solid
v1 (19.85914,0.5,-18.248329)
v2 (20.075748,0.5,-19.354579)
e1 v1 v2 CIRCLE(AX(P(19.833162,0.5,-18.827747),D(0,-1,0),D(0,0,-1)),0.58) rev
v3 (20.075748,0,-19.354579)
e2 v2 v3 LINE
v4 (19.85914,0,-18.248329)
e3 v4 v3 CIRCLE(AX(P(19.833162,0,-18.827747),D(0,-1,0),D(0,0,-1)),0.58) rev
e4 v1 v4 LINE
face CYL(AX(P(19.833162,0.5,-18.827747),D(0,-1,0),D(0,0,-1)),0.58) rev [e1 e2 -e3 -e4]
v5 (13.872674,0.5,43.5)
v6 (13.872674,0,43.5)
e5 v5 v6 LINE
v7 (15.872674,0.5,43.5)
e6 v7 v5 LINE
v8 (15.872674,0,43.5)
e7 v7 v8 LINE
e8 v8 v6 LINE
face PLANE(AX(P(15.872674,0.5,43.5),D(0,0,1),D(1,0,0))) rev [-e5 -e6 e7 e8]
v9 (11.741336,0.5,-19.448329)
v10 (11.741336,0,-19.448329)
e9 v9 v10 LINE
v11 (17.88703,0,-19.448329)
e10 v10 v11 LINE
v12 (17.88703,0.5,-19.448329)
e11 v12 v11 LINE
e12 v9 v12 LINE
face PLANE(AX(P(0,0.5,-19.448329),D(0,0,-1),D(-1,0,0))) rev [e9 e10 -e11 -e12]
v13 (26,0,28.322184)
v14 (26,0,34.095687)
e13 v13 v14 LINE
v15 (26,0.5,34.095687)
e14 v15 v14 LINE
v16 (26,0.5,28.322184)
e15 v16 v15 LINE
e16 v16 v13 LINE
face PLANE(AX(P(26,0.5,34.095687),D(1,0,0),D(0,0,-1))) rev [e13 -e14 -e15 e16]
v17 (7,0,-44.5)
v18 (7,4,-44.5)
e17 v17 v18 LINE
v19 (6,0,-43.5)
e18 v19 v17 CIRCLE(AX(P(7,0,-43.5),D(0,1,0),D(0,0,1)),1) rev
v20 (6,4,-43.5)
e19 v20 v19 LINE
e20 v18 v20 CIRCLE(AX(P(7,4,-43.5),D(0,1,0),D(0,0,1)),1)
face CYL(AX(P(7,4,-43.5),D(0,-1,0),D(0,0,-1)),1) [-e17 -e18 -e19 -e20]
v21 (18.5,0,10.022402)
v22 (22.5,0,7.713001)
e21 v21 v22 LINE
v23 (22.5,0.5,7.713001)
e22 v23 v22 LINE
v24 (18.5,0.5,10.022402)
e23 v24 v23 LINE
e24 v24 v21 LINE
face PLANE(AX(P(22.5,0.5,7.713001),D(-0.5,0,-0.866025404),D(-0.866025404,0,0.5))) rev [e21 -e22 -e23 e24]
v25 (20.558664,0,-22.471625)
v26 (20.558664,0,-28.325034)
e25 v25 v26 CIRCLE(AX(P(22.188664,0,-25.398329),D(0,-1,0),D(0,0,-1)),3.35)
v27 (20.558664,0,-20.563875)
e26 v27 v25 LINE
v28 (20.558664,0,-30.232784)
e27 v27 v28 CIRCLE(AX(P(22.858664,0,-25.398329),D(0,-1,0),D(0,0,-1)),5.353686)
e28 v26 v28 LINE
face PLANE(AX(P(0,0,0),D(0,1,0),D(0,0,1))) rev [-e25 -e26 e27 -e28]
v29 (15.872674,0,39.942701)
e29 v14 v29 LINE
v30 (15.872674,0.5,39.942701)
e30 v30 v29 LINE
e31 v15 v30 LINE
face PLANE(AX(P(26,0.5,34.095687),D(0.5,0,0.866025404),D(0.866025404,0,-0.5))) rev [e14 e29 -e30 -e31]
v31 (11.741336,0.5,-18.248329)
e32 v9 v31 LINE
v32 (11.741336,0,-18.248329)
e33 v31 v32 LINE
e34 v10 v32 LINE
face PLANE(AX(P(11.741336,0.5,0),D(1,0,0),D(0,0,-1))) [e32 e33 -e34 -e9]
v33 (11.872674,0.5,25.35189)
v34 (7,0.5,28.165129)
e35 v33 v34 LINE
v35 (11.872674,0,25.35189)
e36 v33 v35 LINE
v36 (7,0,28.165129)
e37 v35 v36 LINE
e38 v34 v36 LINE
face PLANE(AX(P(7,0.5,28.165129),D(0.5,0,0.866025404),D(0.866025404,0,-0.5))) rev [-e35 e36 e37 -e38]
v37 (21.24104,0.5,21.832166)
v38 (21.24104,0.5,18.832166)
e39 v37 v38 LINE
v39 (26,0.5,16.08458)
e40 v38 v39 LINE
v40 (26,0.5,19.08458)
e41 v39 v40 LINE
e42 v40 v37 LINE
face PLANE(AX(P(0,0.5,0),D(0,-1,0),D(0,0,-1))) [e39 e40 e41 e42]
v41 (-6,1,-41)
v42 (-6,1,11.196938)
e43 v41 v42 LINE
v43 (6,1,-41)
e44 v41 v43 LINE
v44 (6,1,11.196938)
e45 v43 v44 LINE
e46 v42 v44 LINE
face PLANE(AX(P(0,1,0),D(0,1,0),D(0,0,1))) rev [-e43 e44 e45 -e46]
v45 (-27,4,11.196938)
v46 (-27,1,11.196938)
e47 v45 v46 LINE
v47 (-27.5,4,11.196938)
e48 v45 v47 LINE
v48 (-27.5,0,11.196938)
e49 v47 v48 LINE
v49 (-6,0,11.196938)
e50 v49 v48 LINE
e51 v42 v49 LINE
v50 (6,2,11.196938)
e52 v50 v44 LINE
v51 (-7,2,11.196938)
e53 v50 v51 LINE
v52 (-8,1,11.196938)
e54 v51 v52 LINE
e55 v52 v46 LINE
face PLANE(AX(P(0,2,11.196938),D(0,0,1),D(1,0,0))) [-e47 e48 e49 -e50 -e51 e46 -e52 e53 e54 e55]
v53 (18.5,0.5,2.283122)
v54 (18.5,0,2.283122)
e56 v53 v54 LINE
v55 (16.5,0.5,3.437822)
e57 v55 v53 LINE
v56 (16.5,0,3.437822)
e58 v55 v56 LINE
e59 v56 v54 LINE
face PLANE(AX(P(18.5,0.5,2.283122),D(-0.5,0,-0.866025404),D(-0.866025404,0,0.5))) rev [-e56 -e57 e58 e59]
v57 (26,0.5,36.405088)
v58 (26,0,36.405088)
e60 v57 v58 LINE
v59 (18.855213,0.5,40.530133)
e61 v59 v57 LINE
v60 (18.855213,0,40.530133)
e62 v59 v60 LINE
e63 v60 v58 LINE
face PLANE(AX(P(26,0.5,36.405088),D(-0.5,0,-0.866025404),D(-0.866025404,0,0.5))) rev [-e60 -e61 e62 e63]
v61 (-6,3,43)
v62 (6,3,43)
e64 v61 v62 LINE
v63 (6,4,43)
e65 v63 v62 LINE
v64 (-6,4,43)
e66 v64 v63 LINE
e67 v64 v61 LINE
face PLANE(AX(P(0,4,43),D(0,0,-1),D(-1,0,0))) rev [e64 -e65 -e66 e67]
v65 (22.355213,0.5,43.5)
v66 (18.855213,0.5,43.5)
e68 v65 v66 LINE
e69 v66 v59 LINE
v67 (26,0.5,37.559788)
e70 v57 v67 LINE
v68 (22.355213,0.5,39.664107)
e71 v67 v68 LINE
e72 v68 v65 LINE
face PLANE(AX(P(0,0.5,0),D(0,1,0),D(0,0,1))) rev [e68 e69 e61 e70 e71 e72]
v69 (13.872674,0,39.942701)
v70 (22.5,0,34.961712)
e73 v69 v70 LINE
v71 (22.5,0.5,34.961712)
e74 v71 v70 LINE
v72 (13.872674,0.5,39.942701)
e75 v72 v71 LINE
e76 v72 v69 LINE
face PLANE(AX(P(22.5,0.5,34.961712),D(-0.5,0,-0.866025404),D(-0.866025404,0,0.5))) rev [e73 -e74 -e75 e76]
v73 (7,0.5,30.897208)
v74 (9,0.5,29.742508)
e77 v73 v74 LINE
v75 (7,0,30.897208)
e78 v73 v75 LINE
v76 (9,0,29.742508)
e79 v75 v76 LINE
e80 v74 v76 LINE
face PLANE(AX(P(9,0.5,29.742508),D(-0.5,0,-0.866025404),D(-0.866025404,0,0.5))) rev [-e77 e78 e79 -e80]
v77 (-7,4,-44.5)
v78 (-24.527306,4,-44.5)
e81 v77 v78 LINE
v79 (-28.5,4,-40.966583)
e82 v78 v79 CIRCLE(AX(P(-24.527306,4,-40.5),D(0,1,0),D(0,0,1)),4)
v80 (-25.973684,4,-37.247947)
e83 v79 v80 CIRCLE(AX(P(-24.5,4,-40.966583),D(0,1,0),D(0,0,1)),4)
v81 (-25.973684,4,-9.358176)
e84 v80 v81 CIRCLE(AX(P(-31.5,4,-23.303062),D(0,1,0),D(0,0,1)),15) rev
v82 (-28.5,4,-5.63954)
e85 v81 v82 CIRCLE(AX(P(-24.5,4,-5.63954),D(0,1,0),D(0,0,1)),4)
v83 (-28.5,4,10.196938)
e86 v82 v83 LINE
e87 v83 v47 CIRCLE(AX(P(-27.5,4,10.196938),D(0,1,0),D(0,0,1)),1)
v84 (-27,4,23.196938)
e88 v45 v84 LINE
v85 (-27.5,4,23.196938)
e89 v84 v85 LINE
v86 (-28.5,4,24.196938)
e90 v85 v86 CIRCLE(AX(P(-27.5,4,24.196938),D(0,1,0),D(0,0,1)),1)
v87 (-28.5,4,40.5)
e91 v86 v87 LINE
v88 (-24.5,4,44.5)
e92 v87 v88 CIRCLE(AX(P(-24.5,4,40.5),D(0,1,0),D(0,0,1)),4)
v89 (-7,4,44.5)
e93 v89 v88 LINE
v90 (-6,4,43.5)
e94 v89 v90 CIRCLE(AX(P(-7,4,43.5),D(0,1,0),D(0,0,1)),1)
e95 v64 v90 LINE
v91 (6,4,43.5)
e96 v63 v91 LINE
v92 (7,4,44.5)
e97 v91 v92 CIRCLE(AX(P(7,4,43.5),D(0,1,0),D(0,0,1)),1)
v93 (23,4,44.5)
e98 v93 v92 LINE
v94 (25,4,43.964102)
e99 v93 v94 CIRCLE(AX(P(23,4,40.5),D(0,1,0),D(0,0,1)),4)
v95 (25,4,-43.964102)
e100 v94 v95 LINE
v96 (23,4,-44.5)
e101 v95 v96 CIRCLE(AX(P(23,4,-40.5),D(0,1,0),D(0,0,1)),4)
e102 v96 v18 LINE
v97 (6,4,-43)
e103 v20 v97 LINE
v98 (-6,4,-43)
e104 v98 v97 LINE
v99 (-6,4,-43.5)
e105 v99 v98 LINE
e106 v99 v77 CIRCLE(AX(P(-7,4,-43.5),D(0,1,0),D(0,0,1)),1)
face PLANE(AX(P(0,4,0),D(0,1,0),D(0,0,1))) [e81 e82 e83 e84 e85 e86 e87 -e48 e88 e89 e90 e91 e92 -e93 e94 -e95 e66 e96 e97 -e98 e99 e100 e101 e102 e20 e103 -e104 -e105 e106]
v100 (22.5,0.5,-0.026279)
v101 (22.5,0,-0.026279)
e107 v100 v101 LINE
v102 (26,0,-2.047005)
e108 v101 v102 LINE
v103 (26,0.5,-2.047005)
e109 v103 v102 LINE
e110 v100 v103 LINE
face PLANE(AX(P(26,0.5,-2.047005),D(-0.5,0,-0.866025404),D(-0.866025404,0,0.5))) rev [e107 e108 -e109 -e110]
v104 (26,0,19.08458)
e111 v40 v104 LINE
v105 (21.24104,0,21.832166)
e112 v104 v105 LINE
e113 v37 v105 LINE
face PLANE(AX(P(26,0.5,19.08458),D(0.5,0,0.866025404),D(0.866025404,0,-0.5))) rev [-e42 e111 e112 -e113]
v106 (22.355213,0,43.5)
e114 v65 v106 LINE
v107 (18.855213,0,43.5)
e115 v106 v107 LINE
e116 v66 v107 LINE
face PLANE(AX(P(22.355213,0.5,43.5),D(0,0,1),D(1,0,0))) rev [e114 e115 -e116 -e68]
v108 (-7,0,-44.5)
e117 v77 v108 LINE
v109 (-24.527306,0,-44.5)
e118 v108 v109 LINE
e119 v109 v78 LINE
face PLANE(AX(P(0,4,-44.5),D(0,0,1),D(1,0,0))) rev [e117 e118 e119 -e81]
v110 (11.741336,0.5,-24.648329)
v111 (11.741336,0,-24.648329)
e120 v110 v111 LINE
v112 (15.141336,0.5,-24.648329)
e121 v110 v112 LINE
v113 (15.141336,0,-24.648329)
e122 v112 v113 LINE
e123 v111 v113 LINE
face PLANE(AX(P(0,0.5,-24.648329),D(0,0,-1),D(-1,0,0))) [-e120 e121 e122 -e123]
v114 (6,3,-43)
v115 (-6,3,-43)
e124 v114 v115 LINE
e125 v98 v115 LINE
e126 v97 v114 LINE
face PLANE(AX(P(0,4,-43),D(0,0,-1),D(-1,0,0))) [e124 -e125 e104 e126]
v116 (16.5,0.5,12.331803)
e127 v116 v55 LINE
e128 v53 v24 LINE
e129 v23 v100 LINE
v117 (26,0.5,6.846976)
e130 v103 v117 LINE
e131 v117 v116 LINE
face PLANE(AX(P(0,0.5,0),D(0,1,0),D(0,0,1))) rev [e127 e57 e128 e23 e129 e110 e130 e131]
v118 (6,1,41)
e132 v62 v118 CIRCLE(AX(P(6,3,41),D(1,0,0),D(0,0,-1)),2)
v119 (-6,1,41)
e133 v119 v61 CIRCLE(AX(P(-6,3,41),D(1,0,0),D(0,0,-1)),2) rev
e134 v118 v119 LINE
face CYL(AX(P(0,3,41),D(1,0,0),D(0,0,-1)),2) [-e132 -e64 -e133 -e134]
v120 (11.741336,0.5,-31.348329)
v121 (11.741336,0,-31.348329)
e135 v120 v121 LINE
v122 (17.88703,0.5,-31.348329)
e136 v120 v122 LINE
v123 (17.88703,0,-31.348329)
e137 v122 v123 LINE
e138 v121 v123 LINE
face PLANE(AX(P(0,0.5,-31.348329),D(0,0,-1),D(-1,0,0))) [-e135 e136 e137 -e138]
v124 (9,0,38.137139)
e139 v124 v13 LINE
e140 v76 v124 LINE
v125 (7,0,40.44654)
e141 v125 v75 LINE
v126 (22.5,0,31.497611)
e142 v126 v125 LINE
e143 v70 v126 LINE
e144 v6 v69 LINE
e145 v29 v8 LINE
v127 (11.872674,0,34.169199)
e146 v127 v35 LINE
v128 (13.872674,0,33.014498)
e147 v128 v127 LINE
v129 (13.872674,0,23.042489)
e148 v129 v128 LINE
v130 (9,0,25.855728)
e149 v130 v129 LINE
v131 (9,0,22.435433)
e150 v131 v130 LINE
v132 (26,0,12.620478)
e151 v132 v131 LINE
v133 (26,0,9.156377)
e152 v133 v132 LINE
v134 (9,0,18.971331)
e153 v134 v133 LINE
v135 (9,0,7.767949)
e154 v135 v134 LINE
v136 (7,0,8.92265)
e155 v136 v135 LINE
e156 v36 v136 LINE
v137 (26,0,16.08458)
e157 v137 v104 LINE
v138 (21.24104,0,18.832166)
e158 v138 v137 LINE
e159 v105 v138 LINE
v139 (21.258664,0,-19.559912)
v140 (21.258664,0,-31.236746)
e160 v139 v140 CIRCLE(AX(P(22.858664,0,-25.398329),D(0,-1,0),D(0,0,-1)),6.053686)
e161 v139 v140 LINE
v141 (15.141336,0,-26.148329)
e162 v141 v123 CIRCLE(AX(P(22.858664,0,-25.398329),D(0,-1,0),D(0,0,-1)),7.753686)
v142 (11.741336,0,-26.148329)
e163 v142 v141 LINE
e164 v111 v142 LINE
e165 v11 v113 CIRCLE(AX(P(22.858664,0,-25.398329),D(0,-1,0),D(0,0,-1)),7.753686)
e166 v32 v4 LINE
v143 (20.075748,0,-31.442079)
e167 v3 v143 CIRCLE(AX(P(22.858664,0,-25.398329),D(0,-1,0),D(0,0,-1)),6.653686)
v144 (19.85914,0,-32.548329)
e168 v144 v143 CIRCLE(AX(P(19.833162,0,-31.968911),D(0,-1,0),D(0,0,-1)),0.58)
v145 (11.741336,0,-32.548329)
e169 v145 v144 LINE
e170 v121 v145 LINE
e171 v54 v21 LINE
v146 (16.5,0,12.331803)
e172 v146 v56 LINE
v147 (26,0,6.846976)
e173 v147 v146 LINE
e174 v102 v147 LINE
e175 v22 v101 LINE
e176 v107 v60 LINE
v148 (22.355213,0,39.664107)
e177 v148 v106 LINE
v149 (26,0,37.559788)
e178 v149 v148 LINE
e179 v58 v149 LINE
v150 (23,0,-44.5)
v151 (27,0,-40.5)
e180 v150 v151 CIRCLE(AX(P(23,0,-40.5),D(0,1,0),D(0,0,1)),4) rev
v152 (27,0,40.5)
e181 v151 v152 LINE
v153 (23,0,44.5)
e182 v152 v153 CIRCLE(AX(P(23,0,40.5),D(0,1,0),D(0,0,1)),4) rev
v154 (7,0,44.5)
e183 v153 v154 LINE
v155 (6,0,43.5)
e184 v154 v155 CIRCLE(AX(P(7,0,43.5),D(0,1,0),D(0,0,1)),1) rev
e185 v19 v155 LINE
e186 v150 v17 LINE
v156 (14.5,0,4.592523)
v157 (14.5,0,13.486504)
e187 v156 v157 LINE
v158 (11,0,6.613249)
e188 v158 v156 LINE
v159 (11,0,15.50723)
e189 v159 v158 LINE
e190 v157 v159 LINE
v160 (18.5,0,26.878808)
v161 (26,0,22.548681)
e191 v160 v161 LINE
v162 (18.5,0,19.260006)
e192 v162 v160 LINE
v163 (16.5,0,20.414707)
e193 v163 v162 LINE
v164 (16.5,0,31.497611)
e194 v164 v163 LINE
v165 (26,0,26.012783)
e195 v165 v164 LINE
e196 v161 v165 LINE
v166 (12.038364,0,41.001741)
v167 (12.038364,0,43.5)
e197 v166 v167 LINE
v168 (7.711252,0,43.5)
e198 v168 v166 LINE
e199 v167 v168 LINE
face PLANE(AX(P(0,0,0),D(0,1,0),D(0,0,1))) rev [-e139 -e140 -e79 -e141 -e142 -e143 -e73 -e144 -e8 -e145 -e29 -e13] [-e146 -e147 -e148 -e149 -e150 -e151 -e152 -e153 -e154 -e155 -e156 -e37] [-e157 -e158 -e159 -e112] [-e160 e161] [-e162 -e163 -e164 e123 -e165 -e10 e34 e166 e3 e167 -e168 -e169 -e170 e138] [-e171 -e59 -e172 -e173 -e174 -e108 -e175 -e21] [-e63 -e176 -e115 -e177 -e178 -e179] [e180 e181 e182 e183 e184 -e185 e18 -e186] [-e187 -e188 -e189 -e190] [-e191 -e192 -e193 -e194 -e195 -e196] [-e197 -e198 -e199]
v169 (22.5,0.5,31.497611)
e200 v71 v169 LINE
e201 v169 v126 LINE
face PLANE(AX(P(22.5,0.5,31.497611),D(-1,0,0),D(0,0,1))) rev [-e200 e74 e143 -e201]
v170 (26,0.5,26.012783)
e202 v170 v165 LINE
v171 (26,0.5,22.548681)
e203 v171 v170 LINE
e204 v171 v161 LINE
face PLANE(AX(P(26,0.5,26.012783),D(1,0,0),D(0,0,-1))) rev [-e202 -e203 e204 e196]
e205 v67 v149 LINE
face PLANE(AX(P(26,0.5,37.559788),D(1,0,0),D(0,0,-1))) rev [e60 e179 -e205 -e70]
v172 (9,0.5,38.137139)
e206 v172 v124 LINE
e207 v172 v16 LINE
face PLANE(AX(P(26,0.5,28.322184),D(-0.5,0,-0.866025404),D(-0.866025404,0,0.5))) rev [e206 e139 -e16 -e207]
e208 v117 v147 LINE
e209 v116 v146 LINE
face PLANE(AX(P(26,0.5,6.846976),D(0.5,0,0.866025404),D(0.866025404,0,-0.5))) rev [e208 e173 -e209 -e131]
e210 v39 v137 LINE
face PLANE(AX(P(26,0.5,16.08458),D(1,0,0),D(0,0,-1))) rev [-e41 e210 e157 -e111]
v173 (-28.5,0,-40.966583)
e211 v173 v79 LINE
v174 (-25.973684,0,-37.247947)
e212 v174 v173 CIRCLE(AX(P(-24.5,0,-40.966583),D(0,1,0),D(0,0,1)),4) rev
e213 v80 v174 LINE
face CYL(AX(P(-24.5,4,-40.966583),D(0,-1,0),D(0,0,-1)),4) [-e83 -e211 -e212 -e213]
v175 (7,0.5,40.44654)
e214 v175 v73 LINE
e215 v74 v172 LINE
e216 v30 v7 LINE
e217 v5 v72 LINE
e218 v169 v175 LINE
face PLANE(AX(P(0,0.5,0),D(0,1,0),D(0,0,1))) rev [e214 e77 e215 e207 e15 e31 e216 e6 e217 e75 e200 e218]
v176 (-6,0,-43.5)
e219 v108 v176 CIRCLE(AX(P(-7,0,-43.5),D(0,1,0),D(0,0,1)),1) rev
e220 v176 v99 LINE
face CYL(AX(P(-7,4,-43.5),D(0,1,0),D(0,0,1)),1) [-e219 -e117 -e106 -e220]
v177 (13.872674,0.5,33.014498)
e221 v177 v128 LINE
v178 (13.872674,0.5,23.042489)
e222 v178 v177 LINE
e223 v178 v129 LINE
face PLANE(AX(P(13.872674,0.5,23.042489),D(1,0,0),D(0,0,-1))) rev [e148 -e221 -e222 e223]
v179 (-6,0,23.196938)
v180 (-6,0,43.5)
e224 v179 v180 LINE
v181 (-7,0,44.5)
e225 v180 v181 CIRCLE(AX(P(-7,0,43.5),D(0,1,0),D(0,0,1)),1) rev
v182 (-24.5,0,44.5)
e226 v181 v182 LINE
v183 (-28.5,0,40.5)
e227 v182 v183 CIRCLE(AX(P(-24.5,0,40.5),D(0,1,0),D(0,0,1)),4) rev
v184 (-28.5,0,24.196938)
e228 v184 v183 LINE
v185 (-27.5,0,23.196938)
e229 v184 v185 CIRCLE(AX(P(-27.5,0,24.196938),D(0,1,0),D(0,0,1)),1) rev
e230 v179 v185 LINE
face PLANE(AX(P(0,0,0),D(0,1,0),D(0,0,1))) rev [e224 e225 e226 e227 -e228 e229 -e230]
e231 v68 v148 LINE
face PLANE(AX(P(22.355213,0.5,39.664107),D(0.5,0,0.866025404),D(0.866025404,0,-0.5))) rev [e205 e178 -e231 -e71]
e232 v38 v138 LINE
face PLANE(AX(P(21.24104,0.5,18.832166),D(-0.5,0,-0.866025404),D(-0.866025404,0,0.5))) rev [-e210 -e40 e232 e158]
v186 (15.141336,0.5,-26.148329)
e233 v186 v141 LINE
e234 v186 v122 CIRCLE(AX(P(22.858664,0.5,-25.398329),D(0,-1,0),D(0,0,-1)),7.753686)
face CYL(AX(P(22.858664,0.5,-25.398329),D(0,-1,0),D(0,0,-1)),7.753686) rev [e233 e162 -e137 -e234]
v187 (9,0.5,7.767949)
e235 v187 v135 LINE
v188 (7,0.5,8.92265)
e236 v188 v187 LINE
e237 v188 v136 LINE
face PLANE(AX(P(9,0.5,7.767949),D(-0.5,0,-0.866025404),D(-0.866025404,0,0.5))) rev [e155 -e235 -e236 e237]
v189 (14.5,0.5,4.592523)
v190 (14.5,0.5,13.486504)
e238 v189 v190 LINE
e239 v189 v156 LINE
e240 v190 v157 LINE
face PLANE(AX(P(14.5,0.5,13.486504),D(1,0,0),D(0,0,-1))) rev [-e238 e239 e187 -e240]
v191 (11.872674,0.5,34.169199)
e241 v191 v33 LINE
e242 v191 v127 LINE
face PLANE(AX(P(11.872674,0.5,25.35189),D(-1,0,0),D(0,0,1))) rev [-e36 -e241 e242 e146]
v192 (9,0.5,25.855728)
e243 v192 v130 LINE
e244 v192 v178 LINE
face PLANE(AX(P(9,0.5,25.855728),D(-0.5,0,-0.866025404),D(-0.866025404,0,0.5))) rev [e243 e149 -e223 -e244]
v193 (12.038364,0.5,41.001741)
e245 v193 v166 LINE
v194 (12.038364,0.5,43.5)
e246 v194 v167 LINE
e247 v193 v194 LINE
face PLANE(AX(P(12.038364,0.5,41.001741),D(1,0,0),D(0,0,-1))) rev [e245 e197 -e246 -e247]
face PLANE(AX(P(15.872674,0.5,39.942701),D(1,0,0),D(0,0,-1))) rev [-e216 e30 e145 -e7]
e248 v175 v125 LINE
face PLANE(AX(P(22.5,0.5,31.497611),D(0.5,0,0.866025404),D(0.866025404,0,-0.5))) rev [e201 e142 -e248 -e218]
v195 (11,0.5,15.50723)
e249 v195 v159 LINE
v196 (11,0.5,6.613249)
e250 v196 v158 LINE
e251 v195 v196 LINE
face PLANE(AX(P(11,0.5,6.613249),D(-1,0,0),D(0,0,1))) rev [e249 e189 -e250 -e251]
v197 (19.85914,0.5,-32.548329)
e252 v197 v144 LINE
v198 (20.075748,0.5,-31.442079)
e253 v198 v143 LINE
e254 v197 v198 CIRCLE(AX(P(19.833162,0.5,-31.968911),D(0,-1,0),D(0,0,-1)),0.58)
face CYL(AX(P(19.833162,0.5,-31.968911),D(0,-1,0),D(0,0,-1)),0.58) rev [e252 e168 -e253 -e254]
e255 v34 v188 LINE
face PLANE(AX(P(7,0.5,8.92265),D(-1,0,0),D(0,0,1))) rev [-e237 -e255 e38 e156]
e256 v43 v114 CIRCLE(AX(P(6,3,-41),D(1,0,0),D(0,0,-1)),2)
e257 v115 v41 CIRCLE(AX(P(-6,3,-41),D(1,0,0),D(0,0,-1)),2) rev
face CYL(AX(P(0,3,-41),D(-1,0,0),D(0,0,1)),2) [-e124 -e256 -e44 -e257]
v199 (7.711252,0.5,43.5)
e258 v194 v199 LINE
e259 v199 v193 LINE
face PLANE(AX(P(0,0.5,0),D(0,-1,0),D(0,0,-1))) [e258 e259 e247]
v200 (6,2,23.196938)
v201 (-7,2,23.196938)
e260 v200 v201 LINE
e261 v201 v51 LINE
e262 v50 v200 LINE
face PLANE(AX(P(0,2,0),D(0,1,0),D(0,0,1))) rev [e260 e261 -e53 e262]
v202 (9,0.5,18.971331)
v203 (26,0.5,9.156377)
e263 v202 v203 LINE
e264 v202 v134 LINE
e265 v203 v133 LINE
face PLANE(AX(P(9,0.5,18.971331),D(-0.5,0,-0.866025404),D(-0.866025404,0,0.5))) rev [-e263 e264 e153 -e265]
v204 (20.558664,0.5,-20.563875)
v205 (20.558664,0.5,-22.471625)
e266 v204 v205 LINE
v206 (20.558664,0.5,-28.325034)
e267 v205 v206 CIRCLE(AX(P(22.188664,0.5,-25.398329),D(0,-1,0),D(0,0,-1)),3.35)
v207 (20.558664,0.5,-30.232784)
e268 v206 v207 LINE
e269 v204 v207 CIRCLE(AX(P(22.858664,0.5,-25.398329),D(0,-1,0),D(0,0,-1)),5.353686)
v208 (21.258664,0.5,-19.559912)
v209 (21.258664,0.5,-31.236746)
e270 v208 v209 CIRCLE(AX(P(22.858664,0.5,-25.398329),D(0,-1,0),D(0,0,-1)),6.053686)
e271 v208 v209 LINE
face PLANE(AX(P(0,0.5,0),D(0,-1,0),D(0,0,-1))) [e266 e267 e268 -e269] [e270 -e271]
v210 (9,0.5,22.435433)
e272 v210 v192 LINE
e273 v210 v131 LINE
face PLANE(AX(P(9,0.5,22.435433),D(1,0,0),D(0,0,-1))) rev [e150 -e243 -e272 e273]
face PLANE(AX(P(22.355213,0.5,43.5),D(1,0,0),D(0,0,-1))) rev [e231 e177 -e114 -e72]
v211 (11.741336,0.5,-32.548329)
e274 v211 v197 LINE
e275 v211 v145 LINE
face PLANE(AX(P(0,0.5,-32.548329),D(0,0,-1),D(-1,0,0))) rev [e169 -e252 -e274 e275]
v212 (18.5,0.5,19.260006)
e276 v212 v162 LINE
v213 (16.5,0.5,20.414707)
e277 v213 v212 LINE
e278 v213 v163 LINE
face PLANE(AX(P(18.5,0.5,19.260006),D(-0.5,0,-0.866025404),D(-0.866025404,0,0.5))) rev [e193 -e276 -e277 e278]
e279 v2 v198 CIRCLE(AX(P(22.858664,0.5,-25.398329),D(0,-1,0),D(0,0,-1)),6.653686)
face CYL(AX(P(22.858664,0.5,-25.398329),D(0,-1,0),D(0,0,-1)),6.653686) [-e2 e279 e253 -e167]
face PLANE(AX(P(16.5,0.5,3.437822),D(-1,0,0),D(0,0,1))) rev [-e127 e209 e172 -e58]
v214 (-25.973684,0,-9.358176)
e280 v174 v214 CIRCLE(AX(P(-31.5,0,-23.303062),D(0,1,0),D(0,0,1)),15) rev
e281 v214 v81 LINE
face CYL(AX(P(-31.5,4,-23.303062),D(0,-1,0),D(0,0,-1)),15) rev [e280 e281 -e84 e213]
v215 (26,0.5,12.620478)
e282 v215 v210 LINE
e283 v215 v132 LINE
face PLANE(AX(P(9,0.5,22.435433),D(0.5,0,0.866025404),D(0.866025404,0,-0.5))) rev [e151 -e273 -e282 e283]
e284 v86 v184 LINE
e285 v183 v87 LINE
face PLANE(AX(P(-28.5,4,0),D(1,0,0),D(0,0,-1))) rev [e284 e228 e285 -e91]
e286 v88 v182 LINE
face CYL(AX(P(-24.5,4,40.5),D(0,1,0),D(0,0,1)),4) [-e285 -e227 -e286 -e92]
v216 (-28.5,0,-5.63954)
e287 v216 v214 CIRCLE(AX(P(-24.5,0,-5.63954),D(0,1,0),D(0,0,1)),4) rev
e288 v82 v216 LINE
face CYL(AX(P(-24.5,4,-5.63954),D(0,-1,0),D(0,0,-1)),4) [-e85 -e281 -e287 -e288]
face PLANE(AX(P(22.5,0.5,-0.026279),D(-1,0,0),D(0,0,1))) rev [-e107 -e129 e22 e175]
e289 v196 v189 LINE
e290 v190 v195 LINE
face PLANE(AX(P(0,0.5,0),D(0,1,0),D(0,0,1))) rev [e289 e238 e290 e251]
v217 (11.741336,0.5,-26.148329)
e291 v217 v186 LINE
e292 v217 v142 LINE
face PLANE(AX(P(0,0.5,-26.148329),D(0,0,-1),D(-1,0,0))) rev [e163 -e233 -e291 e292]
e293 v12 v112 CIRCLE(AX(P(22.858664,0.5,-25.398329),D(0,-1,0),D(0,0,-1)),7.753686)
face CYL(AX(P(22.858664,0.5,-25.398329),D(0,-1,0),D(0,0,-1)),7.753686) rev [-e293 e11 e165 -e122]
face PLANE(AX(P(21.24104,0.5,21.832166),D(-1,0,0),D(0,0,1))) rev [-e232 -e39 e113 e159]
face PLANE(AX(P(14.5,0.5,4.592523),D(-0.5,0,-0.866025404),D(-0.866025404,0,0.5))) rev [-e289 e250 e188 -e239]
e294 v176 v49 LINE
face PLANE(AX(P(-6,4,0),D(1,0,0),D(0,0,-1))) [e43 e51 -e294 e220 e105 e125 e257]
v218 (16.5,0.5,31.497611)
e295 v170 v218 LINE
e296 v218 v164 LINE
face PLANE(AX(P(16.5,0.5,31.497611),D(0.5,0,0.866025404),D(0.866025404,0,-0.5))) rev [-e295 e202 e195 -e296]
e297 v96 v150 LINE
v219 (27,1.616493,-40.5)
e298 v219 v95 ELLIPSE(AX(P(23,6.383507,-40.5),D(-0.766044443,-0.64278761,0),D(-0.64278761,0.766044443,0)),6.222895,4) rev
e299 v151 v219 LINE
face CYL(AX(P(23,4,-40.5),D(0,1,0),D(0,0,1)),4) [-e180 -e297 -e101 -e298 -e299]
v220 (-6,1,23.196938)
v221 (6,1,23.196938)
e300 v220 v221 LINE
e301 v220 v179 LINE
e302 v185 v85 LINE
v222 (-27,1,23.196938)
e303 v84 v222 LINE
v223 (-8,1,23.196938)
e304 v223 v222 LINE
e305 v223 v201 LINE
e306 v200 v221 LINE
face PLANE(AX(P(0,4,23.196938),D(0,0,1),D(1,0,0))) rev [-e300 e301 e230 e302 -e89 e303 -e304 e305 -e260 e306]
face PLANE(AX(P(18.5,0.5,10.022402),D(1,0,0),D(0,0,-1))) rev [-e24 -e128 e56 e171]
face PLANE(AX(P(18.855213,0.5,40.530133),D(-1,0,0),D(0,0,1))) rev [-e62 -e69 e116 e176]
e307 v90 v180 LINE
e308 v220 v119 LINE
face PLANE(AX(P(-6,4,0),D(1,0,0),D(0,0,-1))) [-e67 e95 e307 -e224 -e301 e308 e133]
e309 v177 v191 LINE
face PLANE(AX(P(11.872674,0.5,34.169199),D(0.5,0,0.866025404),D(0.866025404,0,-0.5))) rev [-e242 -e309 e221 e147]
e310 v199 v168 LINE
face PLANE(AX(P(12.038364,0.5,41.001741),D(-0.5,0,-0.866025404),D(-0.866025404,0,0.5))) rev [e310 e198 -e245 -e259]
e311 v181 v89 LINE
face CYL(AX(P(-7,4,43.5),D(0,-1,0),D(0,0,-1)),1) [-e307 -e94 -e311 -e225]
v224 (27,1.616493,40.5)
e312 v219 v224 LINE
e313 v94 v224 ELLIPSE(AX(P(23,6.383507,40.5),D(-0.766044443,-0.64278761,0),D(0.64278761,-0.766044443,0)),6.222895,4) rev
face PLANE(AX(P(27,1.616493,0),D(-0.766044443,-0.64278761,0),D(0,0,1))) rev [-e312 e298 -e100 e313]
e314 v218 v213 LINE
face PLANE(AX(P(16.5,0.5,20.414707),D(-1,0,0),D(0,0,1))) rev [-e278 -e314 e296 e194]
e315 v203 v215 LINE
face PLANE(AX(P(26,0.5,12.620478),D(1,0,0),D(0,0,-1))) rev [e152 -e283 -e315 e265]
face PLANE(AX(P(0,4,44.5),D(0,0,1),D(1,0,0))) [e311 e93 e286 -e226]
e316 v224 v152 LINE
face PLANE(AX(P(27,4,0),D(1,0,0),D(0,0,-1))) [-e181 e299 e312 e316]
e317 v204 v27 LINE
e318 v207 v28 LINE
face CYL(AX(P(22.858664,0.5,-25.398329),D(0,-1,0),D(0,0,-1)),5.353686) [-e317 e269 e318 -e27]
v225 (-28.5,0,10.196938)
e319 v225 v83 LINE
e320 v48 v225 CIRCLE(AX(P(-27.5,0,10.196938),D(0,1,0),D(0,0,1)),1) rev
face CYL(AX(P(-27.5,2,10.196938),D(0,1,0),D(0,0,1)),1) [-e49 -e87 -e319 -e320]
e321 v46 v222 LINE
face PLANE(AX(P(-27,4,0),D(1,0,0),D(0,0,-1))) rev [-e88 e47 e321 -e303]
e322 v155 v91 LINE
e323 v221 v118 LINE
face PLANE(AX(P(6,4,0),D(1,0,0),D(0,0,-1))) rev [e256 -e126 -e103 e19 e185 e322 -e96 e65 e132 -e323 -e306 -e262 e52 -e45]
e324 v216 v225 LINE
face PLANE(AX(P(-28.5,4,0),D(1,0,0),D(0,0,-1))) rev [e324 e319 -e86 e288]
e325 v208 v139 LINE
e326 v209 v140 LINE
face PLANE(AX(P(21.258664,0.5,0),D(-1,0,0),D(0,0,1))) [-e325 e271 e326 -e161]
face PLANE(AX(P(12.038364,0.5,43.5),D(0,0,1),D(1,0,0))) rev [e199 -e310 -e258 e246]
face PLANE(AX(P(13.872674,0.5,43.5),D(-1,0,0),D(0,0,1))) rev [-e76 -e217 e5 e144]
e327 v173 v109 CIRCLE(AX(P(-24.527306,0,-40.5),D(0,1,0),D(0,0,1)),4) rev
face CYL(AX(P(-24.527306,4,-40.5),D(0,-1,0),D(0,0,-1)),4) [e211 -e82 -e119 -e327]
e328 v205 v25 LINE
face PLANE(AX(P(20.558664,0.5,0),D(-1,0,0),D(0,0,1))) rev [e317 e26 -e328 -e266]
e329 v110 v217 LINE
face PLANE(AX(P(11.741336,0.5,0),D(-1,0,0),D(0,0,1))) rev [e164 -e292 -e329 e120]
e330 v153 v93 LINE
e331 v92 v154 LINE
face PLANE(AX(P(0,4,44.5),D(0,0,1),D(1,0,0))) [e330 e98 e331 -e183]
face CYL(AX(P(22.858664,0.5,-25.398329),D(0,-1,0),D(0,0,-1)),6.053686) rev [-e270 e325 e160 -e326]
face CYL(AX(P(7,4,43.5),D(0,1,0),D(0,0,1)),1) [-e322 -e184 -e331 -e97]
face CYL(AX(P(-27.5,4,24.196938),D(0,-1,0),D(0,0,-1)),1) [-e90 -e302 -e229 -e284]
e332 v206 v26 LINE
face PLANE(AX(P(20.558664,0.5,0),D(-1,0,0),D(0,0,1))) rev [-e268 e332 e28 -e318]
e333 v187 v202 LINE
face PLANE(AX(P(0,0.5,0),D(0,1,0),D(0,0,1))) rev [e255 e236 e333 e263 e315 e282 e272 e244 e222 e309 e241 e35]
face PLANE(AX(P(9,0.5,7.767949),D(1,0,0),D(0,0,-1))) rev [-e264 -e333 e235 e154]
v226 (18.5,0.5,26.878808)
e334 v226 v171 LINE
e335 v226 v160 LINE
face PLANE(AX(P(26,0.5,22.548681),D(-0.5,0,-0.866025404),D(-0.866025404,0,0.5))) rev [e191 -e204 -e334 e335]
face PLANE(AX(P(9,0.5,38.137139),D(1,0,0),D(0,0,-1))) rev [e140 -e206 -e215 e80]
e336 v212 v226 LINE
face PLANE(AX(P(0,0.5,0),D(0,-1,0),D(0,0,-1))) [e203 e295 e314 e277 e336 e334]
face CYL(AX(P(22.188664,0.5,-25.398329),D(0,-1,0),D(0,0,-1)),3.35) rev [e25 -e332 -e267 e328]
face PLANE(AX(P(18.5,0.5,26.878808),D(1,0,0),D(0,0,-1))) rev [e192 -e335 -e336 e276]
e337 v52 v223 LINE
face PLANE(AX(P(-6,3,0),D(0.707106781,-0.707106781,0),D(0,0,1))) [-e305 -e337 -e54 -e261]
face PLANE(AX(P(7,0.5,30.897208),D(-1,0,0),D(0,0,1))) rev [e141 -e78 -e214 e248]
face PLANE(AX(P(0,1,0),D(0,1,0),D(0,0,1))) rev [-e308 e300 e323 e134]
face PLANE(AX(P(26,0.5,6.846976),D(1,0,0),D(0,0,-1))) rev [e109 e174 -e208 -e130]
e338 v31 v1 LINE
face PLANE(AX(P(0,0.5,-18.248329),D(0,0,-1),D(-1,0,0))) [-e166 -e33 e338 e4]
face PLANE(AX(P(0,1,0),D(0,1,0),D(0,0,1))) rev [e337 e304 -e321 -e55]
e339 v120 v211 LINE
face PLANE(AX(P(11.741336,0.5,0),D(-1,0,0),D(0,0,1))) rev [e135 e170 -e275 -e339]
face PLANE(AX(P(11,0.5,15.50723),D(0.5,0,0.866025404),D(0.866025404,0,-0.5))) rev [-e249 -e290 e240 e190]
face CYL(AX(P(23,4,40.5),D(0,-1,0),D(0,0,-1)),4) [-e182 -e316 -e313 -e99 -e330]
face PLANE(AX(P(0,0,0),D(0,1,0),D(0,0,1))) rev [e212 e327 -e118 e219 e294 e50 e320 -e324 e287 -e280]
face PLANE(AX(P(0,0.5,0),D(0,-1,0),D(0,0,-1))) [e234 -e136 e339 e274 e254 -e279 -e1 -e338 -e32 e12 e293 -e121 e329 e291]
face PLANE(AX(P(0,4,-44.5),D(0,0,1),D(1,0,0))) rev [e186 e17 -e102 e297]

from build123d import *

# Parameters (mm, degrees)
SKETCH1_W           = 12
SKETCH1_H           = 54.196938457
SKETCH1_H_2         = 12
SKETCH1_W_2         = 21
SKETCH1_H_3         = 19.803061543
BOSS_EXTRUDE1_DEPTH = 4
SKETCH1_3_W         = 12
SKETCH1_3_H         = 54.196938457
SKETCH1_3_H_2       = 19.803061543
SKETCH1_3_H_3       = 12
SKETCH1_3_W_2       = 21
CUT_EXTRUDE3_DEPTH  = 1
SKETCH1_4_W         = 12
SKETCH1_4_H         = 12
CUT_EXTRUDE4_DEPTH  = 2
CHAMFER1_SIZE       = 2
FILLET2_R           = 4
CHAMFER2_SIZE       = 2
CHAMFER2_SIZE2      = 2.383507185
FILLET1_R           = 4
FILLET3_R           = 2
FILLET4_R           = 1
CUT_EXTRUDE6_DEPTH  = 0.5
CUT_EXTRUDE5_DEPTH  = 0.5


with BuildPart() as part:
    # Sketch1 → Boss-Extrude1 (new body)
    with BuildSketch(Plane(origin=(0, 0, 0), x_dir=(1, 0, 0), z_dir=(0, 1, 0))):
        with BuildLine():
            Line((-6, 43), (-6, 44.5))
            Line((-6, 44.5), (-28.5, 44.5))
            Line((-28.5, 44.5), (-28.5, 38))
            ThreePointArc((-28.5, 38), (-16.5, 23.303061543), (-28.5, 8.606123087))
            Line((-28.5, 8.606123087), (-28.5, -11.196938457))
            Line((-28.5, -11.196938457), (-27, -11.196938457))
            Line((-27, -11.196938457), (-6, -11.196938457))
            Line((-6, -11.196938457), (-6, 43))
        make_face()
        with Locations((0, 15.901530771)):
            Rectangle(SKETCH1_W, SKETCH1_H)
        Polygon((27, -44.5), (27, 44.5), (6, 44.5), (6, 43), (6, -11.196938457), (6, -23.196938457), (6, -43), (6, -44.5), align=None)
        with Locations((0, -17.196938457)):
            Rectangle(SKETCH1_W, SKETCH1_H_2)
        with Locations((-16.5, -17.196938457)):
            Rectangle(SKETCH1_W_2, SKETCH1_H_2)
        Polygon((-28.5, -44.5), (-6, -44.5), (-6, -43), (-6, -23.196938457), (-27, -23.196938457), (-28.5, -23.196938457), align=None)
        with Locations((0, -33.098469229)):
            Rectangle(SKETCH1_W, SKETCH1_H_3)
    extrude(amount=BOSS_EXTRUDE1_DEPTH)

    # Sketch1<3> → Cut-Extrude3 (cut)
    with BuildSketch(Plane(origin=(0, 0, 0), x_dir=(1, 0, 0), z_dir=(0, 1, 0))):
        with Locations((0, 15.901530771)):
            Rectangle(SKETCH1_3_W, SKETCH1_3_H)
        with Locations((0, -33.098469229)):
            Rectangle(SKETCH1_3_W, SKETCH1_3_H_2)
        with Locations((0, -17.196938457)):
            Rectangle(SKETCH1_3_W, SKETCH1_3_H_3)
        with Locations((-16.5, -17.196938457)):
            Rectangle(SKETCH1_3_W_2, SKETCH1_3_H_3)
    extrude(amount=CUT_EXTRUDE3_DEPTH, mode=Mode.SUBTRACT)

    # Sketch1<4> → Cut-Extrude4 (cut)
    with BuildSketch(Plane(origin=(0, 0, 0), x_dir=(1, 0, 0), z_dir=(0, 1, 0))):
        with Locations((0, -17.196938457)):
            Rectangle(SKETCH1_4_W, SKETCH1_4_H)
    extrude(amount=CUT_EXTRUDE4_DEPTH, mode=Mode.SUBTRACT)

    # Chamfer1
    # the kernel refuses this chamfer: 2 mm, written as the material it takes off along each edge
    with BuildSketch(Plane(origin=(-6, 1, 23.196938457), x_dir=(0, 1, 0), z_dir=(0, 0, -1))) as chamfer1_piece_1_section:
        Polygon((CHAMFER1_SIZE, 0), (0, -CHAMFER1_SIZE), (0, 0), align=None)
    chamfer1_piece_1 = extrude(amount=12, mode=Mode.PRIVATE)
    chamfer1_piece_1 = split(chamfer1_piece_1, bisect_by=Plane(origin=(-6, 2, 23.196938457), z_dir=(0, -1, 0)), keep=Keep.TOP, mode=Mode.PRIVATE)
    add(chamfer1_piece_1, mode=Mode.SUBTRACT)

    # Fillet2
    fillet2_edges = [part.edges().sort_by_distance(p)[0] for p in [
        (-28.5, 2, -8.606123087),
        (-28.5, 2, -38),
    ]]
    fillet(fillet2_edges, radius=FILLET2_R)

    # Chamfer2
    chamfer2_edges = [part.edges().sort_by_distance(p)[0] for p in [
        (27, 4, 0),
    ]]
    chamfer2_side = [part.faces().sort_by_distance(p)[0] for p in [
        (0.667186488, 4, 1.280693721),
    ]]
    chamfer(chamfer2_edges, length=CHAMFER2_SIZE, length2=CHAMFER2_SIZE2, reference=chamfer2_side[0])

    # Fillet1
    # the kernel refuses this fillet: 4 mm, written as the material it takes off along each edge
    with BuildSketch(Plane(origin=(-28.5, -10, 44.5), x_dir=(1, 0, 0), z_dir=(0, 1, 0))) as fillet1_piece_1:
        with BuildLine():
            CenterArc((FILLET1_R, FILLET1_R), FILLET1_R, 180, 90)
            Line((0, FILLET1_R), (-FILLET1_R * 0.02, FILLET1_R))
            Line((-FILLET1_R * 0.02, FILLET1_R), (-FILLET1_R * 0.02, -FILLET1_R * 0.02))
            Line((-FILLET1_R * 0.02, -FILLET1_R * 0.02), (FILLET1_R, -FILLET1_R * 0.02))
            Line((FILLET1_R, -FILLET1_R * 0.02), (FILLET1_R, 0))
        make_face()
    extrude(amount=24, mode=Mode.SUBTRACT)
    with BuildSketch(Plane(origin=(-28.5, -9.931735764, -44.5), x_dir=(1, 0, 0), z_dir=(0, 1, 0))) as fillet1_piece_2:
        with BuildLine():
            CenterArc((3.972694306, -4), FILLET1_R, 90, 83.301437518)
            Line((0, -3.533416724), (-0.079453886, -3.524085059))
            ThreePointArc((-0.079453886, -3.524085059), (-0.08, -1.766708362), (-0.08, 0))
            Line((-0.08, 0), (0, 0.08))
            Line((0, 0.08), (3.972694306, 0.08))
            Line((3.972694306, 0.08), (3.972694306, 0))
        make_face()
    extrude(amount=23.863471529, mode=Mode.SUBTRACT)
    with BuildSketch(Plane(origin=(27, -10, -44.5), x_dir=(-1, 0, 0), z_dir=(0, 1, 0))) as fillet1_piece_3:
        with BuildLine():
            CenterArc((FILLET1_R, FILLET1_R), FILLET1_R, 180, 90)
            Line((0, FILLET1_R), (-FILLET1_R * 0.02, FILLET1_R))
            Line((-FILLET1_R * 0.02, FILLET1_R), (-FILLET1_R * 0.02, -FILLET1_R * 0.02))
            Line((-FILLET1_R * 0.02, -FILLET1_R * 0.02), (FILLET1_R, -FILLET1_R * 0.02))
            Line((FILLET1_R, -FILLET1_R * 0.02), (FILLET1_R, 0))
        make_face()
    extrude(amount=21.616492815, mode=Mode.SUBTRACT)
    with BuildSketch(Plane(origin=(27, -10, 44.5), x_dir=(-1, 0, 0), z_dir=(0, 1, 0))) as fillet1_piece_4:
        with BuildLine():
            CenterArc((FILLET1_R, -FILLET1_R), FILLET1_R, 90, 90)
            Line((0, -FILLET1_R), (-FILLET1_R * 0.02, -FILLET1_R))
            Line((-FILLET1_R * 0.02, -FILLET1_R), (-FILLET1_R * 0.02, FILLET1_R * 0.02))
            Line((-FILLET1_R * 0.02, FILLET1_R * 0.02), (FILLET1_R, FILLET1_R * 0.02))
            Line((FILLET1_R, FILLET1_R * 0.02), (FILLET1_R, 0))
        make_face()
    extrude(amount=21.616492815, mode=Mode.SUBTRACT)

    # Fillet3
    fillet3_edges = [part.edges().sort_by_distance(p)[0] for p in [
        (0, 1, -43),
        (0, 1, 43),
    ]]
    fillet(fillet3_edges, radius=FILLET3_R)

    # Fillet4
    fillet4_edges = [part.edges().sort_by_distance(p)[0] for p in [
        (-6, 2, 44.5),
        (-28.5, 2, 23.196938457),
        (-28.5, 2, 11.196938457),
        (-6, 2, -44.5),
        (6, 2, -44.5),
        (6, 2, 44.5),
    ]]
    fillet(fillet4_edges, radius=FILLET4_R)

    # Sketch3 → Cut-Extrude6 (cut)
    with BuildSketch(Plane.XZ):
        Polygon((26, 6.846975509), (26, -2.047005384), (22.5, -0.026279442), (22.5, 7.713000913), (18.5, 10.022401989), (18.5, 2.283121635), (16.5, 3.437822174), (16.5, 12.331803066), align=None)
        Polygon((9, 7.767949192), (9, 18.971331162), (26, 9.156376586), (26, 12.620478201), (9, 22.435432777), (9, 25.855728078), (13.872673559, 23.042488687), (13.872673559, 33.014498231), (11.872673559, 34.16919877), (11.872673559, 25.351889764), (7, 28.165129155), (7, 8.922649731), align=None)
        Polygon((14.5, 4.592522712), (11, 6.613248654), (11, 15.507229547), (14.5, 13.486503605), align=None)
        Polygon((26, 19.084579816), (21.241040405, 21.832166419), (21.241040405, 18.832166419), (26, 16.084579816), align=None)
        Polygon((18.5, 26.87880845), (18.5, 19.260006297), (16.5, 20.414706835), (16.5, 31.497610604), (26, 26.012783046), (26, 22.548681431), align=None)
        Polygon((26, 34.095686815), (26, 28.322184123), (9, 38.137138699), (9, 29.742507874), (7, 30.897208412), (7, 40.446539776), (22.5, 31.497610604), (22.5, 34.961712219), (13.872673559, 39.942701462), (13.872673559, 43.5), (15.872673559, 43.5), (15.872673559, 39.942701462), align=None)
        Polygon((26, 36.405087892), (18.855212659, 40.530132787), (18.855212659, 43.5), (22.355212659, 43.5), (22.355212659, 39.664107383), (26, 37.55978843), align=None)
        Polygon((12.038363906, 41.001740633), (7.711251753, 43.5), (12.038363906, 43.5), align=None)
    extrude(amount=-CUT_EXTRUDE6_DEPTH, mode=Mode.SUBTRACT)

    # Sketch2 → Cut-Extrude5 (cut)
    # profile 1 of 3: a face of its own
    with BuildSketch(Plane.XZ):
        with BuildLine():
            Line((21.258663757, -19.559912495), (21.258663757, -31.236746335))
            ThreePointArc((21.258663757, -31.236746335), (16.804977927, -25.398329415), (21.258663757, -19.559912495))
        make_face()
        with BuildLine():
            ThreePointArc((20.558663757, -20.563874743), (17.504977927, -25.398329415), (20.558663757, -30.232784086))
            Line((20.558663757, -30.232784086), (20.558663757, -28.325034046))
            Line((20.558663757, -28.325034046), (20.558663757, -22.471624783))
            Line((20.558663757, -22.471624783), (20.558663757, -20.563874743))
        make_face(mode=Mode.SUBTRACT)
    # profile 2 of 3: a face of its own
    with BuildSketch(Plane.XZ):
        with BuildLine():
            Line((20.558663757, -22.471624783), (20.558663757, -28.325034046))
            ThreePointArc((20.558663757, -28.325034046), (18.838663757, -25.398329415), (20.558663757, -22.471624783))
        make_face()
    # profile 3 of 3: a face of its own
    with BuildSketch(Plane.XZ):
        with BuildLine():
            ThreePointArc((20.075747841, -19.354579409), (16.204977927, -25.398329415), (20.075747841, -31.442079421))
            ThreePointArc((20.075747841, -31.442079421), (20.402353273, -32.080361375), (19.859139802, -32.548329415))
            Line((19.859139802, -32.548329415), (11.741336243, -32.548329415))
            Line((11.741336243, -32.548329415), (11.741336243, -31.348329415))
            Line((11.741336243, -31.348329415), (17.887029825, -31.348329415))
            ThreePointArc((17.887029825, -31.348329415), (16.002102254, -29.018717282), (15.141336243, -26.148329415))
            Line((15.141336243, -26.148329415), (11.741336243, -26.148329415))
            Line((11.741336243, -26.148329415), (11.741336243, -24.648329415))
            Line((11.741336243, -24.648329415), (15.141336243, -24.648329415))
            ThreePointArc((15.141336243, -24.648329415), (16.002102254, -21.777941547), (17.887029825, -19.448329415))
            Line((17.887029825, -19.448329415), (11.741336243, -19.448329415))
            Line((11.741336243, -19.448329415), (11.741336243, -18.248329415))
            Line((11.741336243, -18.248329415), (19.859139802, -18.248329415))
            ThreePointArc((19.859139802, -18.248329415), (20.402353273, -18.716297455), (20.075747841, -19.354579409))
        make_face()
    extrude(amount=-CUT_EXTRUDE5_DEPTH, mode=Mode.SUBTRACT)


solid = part.part
